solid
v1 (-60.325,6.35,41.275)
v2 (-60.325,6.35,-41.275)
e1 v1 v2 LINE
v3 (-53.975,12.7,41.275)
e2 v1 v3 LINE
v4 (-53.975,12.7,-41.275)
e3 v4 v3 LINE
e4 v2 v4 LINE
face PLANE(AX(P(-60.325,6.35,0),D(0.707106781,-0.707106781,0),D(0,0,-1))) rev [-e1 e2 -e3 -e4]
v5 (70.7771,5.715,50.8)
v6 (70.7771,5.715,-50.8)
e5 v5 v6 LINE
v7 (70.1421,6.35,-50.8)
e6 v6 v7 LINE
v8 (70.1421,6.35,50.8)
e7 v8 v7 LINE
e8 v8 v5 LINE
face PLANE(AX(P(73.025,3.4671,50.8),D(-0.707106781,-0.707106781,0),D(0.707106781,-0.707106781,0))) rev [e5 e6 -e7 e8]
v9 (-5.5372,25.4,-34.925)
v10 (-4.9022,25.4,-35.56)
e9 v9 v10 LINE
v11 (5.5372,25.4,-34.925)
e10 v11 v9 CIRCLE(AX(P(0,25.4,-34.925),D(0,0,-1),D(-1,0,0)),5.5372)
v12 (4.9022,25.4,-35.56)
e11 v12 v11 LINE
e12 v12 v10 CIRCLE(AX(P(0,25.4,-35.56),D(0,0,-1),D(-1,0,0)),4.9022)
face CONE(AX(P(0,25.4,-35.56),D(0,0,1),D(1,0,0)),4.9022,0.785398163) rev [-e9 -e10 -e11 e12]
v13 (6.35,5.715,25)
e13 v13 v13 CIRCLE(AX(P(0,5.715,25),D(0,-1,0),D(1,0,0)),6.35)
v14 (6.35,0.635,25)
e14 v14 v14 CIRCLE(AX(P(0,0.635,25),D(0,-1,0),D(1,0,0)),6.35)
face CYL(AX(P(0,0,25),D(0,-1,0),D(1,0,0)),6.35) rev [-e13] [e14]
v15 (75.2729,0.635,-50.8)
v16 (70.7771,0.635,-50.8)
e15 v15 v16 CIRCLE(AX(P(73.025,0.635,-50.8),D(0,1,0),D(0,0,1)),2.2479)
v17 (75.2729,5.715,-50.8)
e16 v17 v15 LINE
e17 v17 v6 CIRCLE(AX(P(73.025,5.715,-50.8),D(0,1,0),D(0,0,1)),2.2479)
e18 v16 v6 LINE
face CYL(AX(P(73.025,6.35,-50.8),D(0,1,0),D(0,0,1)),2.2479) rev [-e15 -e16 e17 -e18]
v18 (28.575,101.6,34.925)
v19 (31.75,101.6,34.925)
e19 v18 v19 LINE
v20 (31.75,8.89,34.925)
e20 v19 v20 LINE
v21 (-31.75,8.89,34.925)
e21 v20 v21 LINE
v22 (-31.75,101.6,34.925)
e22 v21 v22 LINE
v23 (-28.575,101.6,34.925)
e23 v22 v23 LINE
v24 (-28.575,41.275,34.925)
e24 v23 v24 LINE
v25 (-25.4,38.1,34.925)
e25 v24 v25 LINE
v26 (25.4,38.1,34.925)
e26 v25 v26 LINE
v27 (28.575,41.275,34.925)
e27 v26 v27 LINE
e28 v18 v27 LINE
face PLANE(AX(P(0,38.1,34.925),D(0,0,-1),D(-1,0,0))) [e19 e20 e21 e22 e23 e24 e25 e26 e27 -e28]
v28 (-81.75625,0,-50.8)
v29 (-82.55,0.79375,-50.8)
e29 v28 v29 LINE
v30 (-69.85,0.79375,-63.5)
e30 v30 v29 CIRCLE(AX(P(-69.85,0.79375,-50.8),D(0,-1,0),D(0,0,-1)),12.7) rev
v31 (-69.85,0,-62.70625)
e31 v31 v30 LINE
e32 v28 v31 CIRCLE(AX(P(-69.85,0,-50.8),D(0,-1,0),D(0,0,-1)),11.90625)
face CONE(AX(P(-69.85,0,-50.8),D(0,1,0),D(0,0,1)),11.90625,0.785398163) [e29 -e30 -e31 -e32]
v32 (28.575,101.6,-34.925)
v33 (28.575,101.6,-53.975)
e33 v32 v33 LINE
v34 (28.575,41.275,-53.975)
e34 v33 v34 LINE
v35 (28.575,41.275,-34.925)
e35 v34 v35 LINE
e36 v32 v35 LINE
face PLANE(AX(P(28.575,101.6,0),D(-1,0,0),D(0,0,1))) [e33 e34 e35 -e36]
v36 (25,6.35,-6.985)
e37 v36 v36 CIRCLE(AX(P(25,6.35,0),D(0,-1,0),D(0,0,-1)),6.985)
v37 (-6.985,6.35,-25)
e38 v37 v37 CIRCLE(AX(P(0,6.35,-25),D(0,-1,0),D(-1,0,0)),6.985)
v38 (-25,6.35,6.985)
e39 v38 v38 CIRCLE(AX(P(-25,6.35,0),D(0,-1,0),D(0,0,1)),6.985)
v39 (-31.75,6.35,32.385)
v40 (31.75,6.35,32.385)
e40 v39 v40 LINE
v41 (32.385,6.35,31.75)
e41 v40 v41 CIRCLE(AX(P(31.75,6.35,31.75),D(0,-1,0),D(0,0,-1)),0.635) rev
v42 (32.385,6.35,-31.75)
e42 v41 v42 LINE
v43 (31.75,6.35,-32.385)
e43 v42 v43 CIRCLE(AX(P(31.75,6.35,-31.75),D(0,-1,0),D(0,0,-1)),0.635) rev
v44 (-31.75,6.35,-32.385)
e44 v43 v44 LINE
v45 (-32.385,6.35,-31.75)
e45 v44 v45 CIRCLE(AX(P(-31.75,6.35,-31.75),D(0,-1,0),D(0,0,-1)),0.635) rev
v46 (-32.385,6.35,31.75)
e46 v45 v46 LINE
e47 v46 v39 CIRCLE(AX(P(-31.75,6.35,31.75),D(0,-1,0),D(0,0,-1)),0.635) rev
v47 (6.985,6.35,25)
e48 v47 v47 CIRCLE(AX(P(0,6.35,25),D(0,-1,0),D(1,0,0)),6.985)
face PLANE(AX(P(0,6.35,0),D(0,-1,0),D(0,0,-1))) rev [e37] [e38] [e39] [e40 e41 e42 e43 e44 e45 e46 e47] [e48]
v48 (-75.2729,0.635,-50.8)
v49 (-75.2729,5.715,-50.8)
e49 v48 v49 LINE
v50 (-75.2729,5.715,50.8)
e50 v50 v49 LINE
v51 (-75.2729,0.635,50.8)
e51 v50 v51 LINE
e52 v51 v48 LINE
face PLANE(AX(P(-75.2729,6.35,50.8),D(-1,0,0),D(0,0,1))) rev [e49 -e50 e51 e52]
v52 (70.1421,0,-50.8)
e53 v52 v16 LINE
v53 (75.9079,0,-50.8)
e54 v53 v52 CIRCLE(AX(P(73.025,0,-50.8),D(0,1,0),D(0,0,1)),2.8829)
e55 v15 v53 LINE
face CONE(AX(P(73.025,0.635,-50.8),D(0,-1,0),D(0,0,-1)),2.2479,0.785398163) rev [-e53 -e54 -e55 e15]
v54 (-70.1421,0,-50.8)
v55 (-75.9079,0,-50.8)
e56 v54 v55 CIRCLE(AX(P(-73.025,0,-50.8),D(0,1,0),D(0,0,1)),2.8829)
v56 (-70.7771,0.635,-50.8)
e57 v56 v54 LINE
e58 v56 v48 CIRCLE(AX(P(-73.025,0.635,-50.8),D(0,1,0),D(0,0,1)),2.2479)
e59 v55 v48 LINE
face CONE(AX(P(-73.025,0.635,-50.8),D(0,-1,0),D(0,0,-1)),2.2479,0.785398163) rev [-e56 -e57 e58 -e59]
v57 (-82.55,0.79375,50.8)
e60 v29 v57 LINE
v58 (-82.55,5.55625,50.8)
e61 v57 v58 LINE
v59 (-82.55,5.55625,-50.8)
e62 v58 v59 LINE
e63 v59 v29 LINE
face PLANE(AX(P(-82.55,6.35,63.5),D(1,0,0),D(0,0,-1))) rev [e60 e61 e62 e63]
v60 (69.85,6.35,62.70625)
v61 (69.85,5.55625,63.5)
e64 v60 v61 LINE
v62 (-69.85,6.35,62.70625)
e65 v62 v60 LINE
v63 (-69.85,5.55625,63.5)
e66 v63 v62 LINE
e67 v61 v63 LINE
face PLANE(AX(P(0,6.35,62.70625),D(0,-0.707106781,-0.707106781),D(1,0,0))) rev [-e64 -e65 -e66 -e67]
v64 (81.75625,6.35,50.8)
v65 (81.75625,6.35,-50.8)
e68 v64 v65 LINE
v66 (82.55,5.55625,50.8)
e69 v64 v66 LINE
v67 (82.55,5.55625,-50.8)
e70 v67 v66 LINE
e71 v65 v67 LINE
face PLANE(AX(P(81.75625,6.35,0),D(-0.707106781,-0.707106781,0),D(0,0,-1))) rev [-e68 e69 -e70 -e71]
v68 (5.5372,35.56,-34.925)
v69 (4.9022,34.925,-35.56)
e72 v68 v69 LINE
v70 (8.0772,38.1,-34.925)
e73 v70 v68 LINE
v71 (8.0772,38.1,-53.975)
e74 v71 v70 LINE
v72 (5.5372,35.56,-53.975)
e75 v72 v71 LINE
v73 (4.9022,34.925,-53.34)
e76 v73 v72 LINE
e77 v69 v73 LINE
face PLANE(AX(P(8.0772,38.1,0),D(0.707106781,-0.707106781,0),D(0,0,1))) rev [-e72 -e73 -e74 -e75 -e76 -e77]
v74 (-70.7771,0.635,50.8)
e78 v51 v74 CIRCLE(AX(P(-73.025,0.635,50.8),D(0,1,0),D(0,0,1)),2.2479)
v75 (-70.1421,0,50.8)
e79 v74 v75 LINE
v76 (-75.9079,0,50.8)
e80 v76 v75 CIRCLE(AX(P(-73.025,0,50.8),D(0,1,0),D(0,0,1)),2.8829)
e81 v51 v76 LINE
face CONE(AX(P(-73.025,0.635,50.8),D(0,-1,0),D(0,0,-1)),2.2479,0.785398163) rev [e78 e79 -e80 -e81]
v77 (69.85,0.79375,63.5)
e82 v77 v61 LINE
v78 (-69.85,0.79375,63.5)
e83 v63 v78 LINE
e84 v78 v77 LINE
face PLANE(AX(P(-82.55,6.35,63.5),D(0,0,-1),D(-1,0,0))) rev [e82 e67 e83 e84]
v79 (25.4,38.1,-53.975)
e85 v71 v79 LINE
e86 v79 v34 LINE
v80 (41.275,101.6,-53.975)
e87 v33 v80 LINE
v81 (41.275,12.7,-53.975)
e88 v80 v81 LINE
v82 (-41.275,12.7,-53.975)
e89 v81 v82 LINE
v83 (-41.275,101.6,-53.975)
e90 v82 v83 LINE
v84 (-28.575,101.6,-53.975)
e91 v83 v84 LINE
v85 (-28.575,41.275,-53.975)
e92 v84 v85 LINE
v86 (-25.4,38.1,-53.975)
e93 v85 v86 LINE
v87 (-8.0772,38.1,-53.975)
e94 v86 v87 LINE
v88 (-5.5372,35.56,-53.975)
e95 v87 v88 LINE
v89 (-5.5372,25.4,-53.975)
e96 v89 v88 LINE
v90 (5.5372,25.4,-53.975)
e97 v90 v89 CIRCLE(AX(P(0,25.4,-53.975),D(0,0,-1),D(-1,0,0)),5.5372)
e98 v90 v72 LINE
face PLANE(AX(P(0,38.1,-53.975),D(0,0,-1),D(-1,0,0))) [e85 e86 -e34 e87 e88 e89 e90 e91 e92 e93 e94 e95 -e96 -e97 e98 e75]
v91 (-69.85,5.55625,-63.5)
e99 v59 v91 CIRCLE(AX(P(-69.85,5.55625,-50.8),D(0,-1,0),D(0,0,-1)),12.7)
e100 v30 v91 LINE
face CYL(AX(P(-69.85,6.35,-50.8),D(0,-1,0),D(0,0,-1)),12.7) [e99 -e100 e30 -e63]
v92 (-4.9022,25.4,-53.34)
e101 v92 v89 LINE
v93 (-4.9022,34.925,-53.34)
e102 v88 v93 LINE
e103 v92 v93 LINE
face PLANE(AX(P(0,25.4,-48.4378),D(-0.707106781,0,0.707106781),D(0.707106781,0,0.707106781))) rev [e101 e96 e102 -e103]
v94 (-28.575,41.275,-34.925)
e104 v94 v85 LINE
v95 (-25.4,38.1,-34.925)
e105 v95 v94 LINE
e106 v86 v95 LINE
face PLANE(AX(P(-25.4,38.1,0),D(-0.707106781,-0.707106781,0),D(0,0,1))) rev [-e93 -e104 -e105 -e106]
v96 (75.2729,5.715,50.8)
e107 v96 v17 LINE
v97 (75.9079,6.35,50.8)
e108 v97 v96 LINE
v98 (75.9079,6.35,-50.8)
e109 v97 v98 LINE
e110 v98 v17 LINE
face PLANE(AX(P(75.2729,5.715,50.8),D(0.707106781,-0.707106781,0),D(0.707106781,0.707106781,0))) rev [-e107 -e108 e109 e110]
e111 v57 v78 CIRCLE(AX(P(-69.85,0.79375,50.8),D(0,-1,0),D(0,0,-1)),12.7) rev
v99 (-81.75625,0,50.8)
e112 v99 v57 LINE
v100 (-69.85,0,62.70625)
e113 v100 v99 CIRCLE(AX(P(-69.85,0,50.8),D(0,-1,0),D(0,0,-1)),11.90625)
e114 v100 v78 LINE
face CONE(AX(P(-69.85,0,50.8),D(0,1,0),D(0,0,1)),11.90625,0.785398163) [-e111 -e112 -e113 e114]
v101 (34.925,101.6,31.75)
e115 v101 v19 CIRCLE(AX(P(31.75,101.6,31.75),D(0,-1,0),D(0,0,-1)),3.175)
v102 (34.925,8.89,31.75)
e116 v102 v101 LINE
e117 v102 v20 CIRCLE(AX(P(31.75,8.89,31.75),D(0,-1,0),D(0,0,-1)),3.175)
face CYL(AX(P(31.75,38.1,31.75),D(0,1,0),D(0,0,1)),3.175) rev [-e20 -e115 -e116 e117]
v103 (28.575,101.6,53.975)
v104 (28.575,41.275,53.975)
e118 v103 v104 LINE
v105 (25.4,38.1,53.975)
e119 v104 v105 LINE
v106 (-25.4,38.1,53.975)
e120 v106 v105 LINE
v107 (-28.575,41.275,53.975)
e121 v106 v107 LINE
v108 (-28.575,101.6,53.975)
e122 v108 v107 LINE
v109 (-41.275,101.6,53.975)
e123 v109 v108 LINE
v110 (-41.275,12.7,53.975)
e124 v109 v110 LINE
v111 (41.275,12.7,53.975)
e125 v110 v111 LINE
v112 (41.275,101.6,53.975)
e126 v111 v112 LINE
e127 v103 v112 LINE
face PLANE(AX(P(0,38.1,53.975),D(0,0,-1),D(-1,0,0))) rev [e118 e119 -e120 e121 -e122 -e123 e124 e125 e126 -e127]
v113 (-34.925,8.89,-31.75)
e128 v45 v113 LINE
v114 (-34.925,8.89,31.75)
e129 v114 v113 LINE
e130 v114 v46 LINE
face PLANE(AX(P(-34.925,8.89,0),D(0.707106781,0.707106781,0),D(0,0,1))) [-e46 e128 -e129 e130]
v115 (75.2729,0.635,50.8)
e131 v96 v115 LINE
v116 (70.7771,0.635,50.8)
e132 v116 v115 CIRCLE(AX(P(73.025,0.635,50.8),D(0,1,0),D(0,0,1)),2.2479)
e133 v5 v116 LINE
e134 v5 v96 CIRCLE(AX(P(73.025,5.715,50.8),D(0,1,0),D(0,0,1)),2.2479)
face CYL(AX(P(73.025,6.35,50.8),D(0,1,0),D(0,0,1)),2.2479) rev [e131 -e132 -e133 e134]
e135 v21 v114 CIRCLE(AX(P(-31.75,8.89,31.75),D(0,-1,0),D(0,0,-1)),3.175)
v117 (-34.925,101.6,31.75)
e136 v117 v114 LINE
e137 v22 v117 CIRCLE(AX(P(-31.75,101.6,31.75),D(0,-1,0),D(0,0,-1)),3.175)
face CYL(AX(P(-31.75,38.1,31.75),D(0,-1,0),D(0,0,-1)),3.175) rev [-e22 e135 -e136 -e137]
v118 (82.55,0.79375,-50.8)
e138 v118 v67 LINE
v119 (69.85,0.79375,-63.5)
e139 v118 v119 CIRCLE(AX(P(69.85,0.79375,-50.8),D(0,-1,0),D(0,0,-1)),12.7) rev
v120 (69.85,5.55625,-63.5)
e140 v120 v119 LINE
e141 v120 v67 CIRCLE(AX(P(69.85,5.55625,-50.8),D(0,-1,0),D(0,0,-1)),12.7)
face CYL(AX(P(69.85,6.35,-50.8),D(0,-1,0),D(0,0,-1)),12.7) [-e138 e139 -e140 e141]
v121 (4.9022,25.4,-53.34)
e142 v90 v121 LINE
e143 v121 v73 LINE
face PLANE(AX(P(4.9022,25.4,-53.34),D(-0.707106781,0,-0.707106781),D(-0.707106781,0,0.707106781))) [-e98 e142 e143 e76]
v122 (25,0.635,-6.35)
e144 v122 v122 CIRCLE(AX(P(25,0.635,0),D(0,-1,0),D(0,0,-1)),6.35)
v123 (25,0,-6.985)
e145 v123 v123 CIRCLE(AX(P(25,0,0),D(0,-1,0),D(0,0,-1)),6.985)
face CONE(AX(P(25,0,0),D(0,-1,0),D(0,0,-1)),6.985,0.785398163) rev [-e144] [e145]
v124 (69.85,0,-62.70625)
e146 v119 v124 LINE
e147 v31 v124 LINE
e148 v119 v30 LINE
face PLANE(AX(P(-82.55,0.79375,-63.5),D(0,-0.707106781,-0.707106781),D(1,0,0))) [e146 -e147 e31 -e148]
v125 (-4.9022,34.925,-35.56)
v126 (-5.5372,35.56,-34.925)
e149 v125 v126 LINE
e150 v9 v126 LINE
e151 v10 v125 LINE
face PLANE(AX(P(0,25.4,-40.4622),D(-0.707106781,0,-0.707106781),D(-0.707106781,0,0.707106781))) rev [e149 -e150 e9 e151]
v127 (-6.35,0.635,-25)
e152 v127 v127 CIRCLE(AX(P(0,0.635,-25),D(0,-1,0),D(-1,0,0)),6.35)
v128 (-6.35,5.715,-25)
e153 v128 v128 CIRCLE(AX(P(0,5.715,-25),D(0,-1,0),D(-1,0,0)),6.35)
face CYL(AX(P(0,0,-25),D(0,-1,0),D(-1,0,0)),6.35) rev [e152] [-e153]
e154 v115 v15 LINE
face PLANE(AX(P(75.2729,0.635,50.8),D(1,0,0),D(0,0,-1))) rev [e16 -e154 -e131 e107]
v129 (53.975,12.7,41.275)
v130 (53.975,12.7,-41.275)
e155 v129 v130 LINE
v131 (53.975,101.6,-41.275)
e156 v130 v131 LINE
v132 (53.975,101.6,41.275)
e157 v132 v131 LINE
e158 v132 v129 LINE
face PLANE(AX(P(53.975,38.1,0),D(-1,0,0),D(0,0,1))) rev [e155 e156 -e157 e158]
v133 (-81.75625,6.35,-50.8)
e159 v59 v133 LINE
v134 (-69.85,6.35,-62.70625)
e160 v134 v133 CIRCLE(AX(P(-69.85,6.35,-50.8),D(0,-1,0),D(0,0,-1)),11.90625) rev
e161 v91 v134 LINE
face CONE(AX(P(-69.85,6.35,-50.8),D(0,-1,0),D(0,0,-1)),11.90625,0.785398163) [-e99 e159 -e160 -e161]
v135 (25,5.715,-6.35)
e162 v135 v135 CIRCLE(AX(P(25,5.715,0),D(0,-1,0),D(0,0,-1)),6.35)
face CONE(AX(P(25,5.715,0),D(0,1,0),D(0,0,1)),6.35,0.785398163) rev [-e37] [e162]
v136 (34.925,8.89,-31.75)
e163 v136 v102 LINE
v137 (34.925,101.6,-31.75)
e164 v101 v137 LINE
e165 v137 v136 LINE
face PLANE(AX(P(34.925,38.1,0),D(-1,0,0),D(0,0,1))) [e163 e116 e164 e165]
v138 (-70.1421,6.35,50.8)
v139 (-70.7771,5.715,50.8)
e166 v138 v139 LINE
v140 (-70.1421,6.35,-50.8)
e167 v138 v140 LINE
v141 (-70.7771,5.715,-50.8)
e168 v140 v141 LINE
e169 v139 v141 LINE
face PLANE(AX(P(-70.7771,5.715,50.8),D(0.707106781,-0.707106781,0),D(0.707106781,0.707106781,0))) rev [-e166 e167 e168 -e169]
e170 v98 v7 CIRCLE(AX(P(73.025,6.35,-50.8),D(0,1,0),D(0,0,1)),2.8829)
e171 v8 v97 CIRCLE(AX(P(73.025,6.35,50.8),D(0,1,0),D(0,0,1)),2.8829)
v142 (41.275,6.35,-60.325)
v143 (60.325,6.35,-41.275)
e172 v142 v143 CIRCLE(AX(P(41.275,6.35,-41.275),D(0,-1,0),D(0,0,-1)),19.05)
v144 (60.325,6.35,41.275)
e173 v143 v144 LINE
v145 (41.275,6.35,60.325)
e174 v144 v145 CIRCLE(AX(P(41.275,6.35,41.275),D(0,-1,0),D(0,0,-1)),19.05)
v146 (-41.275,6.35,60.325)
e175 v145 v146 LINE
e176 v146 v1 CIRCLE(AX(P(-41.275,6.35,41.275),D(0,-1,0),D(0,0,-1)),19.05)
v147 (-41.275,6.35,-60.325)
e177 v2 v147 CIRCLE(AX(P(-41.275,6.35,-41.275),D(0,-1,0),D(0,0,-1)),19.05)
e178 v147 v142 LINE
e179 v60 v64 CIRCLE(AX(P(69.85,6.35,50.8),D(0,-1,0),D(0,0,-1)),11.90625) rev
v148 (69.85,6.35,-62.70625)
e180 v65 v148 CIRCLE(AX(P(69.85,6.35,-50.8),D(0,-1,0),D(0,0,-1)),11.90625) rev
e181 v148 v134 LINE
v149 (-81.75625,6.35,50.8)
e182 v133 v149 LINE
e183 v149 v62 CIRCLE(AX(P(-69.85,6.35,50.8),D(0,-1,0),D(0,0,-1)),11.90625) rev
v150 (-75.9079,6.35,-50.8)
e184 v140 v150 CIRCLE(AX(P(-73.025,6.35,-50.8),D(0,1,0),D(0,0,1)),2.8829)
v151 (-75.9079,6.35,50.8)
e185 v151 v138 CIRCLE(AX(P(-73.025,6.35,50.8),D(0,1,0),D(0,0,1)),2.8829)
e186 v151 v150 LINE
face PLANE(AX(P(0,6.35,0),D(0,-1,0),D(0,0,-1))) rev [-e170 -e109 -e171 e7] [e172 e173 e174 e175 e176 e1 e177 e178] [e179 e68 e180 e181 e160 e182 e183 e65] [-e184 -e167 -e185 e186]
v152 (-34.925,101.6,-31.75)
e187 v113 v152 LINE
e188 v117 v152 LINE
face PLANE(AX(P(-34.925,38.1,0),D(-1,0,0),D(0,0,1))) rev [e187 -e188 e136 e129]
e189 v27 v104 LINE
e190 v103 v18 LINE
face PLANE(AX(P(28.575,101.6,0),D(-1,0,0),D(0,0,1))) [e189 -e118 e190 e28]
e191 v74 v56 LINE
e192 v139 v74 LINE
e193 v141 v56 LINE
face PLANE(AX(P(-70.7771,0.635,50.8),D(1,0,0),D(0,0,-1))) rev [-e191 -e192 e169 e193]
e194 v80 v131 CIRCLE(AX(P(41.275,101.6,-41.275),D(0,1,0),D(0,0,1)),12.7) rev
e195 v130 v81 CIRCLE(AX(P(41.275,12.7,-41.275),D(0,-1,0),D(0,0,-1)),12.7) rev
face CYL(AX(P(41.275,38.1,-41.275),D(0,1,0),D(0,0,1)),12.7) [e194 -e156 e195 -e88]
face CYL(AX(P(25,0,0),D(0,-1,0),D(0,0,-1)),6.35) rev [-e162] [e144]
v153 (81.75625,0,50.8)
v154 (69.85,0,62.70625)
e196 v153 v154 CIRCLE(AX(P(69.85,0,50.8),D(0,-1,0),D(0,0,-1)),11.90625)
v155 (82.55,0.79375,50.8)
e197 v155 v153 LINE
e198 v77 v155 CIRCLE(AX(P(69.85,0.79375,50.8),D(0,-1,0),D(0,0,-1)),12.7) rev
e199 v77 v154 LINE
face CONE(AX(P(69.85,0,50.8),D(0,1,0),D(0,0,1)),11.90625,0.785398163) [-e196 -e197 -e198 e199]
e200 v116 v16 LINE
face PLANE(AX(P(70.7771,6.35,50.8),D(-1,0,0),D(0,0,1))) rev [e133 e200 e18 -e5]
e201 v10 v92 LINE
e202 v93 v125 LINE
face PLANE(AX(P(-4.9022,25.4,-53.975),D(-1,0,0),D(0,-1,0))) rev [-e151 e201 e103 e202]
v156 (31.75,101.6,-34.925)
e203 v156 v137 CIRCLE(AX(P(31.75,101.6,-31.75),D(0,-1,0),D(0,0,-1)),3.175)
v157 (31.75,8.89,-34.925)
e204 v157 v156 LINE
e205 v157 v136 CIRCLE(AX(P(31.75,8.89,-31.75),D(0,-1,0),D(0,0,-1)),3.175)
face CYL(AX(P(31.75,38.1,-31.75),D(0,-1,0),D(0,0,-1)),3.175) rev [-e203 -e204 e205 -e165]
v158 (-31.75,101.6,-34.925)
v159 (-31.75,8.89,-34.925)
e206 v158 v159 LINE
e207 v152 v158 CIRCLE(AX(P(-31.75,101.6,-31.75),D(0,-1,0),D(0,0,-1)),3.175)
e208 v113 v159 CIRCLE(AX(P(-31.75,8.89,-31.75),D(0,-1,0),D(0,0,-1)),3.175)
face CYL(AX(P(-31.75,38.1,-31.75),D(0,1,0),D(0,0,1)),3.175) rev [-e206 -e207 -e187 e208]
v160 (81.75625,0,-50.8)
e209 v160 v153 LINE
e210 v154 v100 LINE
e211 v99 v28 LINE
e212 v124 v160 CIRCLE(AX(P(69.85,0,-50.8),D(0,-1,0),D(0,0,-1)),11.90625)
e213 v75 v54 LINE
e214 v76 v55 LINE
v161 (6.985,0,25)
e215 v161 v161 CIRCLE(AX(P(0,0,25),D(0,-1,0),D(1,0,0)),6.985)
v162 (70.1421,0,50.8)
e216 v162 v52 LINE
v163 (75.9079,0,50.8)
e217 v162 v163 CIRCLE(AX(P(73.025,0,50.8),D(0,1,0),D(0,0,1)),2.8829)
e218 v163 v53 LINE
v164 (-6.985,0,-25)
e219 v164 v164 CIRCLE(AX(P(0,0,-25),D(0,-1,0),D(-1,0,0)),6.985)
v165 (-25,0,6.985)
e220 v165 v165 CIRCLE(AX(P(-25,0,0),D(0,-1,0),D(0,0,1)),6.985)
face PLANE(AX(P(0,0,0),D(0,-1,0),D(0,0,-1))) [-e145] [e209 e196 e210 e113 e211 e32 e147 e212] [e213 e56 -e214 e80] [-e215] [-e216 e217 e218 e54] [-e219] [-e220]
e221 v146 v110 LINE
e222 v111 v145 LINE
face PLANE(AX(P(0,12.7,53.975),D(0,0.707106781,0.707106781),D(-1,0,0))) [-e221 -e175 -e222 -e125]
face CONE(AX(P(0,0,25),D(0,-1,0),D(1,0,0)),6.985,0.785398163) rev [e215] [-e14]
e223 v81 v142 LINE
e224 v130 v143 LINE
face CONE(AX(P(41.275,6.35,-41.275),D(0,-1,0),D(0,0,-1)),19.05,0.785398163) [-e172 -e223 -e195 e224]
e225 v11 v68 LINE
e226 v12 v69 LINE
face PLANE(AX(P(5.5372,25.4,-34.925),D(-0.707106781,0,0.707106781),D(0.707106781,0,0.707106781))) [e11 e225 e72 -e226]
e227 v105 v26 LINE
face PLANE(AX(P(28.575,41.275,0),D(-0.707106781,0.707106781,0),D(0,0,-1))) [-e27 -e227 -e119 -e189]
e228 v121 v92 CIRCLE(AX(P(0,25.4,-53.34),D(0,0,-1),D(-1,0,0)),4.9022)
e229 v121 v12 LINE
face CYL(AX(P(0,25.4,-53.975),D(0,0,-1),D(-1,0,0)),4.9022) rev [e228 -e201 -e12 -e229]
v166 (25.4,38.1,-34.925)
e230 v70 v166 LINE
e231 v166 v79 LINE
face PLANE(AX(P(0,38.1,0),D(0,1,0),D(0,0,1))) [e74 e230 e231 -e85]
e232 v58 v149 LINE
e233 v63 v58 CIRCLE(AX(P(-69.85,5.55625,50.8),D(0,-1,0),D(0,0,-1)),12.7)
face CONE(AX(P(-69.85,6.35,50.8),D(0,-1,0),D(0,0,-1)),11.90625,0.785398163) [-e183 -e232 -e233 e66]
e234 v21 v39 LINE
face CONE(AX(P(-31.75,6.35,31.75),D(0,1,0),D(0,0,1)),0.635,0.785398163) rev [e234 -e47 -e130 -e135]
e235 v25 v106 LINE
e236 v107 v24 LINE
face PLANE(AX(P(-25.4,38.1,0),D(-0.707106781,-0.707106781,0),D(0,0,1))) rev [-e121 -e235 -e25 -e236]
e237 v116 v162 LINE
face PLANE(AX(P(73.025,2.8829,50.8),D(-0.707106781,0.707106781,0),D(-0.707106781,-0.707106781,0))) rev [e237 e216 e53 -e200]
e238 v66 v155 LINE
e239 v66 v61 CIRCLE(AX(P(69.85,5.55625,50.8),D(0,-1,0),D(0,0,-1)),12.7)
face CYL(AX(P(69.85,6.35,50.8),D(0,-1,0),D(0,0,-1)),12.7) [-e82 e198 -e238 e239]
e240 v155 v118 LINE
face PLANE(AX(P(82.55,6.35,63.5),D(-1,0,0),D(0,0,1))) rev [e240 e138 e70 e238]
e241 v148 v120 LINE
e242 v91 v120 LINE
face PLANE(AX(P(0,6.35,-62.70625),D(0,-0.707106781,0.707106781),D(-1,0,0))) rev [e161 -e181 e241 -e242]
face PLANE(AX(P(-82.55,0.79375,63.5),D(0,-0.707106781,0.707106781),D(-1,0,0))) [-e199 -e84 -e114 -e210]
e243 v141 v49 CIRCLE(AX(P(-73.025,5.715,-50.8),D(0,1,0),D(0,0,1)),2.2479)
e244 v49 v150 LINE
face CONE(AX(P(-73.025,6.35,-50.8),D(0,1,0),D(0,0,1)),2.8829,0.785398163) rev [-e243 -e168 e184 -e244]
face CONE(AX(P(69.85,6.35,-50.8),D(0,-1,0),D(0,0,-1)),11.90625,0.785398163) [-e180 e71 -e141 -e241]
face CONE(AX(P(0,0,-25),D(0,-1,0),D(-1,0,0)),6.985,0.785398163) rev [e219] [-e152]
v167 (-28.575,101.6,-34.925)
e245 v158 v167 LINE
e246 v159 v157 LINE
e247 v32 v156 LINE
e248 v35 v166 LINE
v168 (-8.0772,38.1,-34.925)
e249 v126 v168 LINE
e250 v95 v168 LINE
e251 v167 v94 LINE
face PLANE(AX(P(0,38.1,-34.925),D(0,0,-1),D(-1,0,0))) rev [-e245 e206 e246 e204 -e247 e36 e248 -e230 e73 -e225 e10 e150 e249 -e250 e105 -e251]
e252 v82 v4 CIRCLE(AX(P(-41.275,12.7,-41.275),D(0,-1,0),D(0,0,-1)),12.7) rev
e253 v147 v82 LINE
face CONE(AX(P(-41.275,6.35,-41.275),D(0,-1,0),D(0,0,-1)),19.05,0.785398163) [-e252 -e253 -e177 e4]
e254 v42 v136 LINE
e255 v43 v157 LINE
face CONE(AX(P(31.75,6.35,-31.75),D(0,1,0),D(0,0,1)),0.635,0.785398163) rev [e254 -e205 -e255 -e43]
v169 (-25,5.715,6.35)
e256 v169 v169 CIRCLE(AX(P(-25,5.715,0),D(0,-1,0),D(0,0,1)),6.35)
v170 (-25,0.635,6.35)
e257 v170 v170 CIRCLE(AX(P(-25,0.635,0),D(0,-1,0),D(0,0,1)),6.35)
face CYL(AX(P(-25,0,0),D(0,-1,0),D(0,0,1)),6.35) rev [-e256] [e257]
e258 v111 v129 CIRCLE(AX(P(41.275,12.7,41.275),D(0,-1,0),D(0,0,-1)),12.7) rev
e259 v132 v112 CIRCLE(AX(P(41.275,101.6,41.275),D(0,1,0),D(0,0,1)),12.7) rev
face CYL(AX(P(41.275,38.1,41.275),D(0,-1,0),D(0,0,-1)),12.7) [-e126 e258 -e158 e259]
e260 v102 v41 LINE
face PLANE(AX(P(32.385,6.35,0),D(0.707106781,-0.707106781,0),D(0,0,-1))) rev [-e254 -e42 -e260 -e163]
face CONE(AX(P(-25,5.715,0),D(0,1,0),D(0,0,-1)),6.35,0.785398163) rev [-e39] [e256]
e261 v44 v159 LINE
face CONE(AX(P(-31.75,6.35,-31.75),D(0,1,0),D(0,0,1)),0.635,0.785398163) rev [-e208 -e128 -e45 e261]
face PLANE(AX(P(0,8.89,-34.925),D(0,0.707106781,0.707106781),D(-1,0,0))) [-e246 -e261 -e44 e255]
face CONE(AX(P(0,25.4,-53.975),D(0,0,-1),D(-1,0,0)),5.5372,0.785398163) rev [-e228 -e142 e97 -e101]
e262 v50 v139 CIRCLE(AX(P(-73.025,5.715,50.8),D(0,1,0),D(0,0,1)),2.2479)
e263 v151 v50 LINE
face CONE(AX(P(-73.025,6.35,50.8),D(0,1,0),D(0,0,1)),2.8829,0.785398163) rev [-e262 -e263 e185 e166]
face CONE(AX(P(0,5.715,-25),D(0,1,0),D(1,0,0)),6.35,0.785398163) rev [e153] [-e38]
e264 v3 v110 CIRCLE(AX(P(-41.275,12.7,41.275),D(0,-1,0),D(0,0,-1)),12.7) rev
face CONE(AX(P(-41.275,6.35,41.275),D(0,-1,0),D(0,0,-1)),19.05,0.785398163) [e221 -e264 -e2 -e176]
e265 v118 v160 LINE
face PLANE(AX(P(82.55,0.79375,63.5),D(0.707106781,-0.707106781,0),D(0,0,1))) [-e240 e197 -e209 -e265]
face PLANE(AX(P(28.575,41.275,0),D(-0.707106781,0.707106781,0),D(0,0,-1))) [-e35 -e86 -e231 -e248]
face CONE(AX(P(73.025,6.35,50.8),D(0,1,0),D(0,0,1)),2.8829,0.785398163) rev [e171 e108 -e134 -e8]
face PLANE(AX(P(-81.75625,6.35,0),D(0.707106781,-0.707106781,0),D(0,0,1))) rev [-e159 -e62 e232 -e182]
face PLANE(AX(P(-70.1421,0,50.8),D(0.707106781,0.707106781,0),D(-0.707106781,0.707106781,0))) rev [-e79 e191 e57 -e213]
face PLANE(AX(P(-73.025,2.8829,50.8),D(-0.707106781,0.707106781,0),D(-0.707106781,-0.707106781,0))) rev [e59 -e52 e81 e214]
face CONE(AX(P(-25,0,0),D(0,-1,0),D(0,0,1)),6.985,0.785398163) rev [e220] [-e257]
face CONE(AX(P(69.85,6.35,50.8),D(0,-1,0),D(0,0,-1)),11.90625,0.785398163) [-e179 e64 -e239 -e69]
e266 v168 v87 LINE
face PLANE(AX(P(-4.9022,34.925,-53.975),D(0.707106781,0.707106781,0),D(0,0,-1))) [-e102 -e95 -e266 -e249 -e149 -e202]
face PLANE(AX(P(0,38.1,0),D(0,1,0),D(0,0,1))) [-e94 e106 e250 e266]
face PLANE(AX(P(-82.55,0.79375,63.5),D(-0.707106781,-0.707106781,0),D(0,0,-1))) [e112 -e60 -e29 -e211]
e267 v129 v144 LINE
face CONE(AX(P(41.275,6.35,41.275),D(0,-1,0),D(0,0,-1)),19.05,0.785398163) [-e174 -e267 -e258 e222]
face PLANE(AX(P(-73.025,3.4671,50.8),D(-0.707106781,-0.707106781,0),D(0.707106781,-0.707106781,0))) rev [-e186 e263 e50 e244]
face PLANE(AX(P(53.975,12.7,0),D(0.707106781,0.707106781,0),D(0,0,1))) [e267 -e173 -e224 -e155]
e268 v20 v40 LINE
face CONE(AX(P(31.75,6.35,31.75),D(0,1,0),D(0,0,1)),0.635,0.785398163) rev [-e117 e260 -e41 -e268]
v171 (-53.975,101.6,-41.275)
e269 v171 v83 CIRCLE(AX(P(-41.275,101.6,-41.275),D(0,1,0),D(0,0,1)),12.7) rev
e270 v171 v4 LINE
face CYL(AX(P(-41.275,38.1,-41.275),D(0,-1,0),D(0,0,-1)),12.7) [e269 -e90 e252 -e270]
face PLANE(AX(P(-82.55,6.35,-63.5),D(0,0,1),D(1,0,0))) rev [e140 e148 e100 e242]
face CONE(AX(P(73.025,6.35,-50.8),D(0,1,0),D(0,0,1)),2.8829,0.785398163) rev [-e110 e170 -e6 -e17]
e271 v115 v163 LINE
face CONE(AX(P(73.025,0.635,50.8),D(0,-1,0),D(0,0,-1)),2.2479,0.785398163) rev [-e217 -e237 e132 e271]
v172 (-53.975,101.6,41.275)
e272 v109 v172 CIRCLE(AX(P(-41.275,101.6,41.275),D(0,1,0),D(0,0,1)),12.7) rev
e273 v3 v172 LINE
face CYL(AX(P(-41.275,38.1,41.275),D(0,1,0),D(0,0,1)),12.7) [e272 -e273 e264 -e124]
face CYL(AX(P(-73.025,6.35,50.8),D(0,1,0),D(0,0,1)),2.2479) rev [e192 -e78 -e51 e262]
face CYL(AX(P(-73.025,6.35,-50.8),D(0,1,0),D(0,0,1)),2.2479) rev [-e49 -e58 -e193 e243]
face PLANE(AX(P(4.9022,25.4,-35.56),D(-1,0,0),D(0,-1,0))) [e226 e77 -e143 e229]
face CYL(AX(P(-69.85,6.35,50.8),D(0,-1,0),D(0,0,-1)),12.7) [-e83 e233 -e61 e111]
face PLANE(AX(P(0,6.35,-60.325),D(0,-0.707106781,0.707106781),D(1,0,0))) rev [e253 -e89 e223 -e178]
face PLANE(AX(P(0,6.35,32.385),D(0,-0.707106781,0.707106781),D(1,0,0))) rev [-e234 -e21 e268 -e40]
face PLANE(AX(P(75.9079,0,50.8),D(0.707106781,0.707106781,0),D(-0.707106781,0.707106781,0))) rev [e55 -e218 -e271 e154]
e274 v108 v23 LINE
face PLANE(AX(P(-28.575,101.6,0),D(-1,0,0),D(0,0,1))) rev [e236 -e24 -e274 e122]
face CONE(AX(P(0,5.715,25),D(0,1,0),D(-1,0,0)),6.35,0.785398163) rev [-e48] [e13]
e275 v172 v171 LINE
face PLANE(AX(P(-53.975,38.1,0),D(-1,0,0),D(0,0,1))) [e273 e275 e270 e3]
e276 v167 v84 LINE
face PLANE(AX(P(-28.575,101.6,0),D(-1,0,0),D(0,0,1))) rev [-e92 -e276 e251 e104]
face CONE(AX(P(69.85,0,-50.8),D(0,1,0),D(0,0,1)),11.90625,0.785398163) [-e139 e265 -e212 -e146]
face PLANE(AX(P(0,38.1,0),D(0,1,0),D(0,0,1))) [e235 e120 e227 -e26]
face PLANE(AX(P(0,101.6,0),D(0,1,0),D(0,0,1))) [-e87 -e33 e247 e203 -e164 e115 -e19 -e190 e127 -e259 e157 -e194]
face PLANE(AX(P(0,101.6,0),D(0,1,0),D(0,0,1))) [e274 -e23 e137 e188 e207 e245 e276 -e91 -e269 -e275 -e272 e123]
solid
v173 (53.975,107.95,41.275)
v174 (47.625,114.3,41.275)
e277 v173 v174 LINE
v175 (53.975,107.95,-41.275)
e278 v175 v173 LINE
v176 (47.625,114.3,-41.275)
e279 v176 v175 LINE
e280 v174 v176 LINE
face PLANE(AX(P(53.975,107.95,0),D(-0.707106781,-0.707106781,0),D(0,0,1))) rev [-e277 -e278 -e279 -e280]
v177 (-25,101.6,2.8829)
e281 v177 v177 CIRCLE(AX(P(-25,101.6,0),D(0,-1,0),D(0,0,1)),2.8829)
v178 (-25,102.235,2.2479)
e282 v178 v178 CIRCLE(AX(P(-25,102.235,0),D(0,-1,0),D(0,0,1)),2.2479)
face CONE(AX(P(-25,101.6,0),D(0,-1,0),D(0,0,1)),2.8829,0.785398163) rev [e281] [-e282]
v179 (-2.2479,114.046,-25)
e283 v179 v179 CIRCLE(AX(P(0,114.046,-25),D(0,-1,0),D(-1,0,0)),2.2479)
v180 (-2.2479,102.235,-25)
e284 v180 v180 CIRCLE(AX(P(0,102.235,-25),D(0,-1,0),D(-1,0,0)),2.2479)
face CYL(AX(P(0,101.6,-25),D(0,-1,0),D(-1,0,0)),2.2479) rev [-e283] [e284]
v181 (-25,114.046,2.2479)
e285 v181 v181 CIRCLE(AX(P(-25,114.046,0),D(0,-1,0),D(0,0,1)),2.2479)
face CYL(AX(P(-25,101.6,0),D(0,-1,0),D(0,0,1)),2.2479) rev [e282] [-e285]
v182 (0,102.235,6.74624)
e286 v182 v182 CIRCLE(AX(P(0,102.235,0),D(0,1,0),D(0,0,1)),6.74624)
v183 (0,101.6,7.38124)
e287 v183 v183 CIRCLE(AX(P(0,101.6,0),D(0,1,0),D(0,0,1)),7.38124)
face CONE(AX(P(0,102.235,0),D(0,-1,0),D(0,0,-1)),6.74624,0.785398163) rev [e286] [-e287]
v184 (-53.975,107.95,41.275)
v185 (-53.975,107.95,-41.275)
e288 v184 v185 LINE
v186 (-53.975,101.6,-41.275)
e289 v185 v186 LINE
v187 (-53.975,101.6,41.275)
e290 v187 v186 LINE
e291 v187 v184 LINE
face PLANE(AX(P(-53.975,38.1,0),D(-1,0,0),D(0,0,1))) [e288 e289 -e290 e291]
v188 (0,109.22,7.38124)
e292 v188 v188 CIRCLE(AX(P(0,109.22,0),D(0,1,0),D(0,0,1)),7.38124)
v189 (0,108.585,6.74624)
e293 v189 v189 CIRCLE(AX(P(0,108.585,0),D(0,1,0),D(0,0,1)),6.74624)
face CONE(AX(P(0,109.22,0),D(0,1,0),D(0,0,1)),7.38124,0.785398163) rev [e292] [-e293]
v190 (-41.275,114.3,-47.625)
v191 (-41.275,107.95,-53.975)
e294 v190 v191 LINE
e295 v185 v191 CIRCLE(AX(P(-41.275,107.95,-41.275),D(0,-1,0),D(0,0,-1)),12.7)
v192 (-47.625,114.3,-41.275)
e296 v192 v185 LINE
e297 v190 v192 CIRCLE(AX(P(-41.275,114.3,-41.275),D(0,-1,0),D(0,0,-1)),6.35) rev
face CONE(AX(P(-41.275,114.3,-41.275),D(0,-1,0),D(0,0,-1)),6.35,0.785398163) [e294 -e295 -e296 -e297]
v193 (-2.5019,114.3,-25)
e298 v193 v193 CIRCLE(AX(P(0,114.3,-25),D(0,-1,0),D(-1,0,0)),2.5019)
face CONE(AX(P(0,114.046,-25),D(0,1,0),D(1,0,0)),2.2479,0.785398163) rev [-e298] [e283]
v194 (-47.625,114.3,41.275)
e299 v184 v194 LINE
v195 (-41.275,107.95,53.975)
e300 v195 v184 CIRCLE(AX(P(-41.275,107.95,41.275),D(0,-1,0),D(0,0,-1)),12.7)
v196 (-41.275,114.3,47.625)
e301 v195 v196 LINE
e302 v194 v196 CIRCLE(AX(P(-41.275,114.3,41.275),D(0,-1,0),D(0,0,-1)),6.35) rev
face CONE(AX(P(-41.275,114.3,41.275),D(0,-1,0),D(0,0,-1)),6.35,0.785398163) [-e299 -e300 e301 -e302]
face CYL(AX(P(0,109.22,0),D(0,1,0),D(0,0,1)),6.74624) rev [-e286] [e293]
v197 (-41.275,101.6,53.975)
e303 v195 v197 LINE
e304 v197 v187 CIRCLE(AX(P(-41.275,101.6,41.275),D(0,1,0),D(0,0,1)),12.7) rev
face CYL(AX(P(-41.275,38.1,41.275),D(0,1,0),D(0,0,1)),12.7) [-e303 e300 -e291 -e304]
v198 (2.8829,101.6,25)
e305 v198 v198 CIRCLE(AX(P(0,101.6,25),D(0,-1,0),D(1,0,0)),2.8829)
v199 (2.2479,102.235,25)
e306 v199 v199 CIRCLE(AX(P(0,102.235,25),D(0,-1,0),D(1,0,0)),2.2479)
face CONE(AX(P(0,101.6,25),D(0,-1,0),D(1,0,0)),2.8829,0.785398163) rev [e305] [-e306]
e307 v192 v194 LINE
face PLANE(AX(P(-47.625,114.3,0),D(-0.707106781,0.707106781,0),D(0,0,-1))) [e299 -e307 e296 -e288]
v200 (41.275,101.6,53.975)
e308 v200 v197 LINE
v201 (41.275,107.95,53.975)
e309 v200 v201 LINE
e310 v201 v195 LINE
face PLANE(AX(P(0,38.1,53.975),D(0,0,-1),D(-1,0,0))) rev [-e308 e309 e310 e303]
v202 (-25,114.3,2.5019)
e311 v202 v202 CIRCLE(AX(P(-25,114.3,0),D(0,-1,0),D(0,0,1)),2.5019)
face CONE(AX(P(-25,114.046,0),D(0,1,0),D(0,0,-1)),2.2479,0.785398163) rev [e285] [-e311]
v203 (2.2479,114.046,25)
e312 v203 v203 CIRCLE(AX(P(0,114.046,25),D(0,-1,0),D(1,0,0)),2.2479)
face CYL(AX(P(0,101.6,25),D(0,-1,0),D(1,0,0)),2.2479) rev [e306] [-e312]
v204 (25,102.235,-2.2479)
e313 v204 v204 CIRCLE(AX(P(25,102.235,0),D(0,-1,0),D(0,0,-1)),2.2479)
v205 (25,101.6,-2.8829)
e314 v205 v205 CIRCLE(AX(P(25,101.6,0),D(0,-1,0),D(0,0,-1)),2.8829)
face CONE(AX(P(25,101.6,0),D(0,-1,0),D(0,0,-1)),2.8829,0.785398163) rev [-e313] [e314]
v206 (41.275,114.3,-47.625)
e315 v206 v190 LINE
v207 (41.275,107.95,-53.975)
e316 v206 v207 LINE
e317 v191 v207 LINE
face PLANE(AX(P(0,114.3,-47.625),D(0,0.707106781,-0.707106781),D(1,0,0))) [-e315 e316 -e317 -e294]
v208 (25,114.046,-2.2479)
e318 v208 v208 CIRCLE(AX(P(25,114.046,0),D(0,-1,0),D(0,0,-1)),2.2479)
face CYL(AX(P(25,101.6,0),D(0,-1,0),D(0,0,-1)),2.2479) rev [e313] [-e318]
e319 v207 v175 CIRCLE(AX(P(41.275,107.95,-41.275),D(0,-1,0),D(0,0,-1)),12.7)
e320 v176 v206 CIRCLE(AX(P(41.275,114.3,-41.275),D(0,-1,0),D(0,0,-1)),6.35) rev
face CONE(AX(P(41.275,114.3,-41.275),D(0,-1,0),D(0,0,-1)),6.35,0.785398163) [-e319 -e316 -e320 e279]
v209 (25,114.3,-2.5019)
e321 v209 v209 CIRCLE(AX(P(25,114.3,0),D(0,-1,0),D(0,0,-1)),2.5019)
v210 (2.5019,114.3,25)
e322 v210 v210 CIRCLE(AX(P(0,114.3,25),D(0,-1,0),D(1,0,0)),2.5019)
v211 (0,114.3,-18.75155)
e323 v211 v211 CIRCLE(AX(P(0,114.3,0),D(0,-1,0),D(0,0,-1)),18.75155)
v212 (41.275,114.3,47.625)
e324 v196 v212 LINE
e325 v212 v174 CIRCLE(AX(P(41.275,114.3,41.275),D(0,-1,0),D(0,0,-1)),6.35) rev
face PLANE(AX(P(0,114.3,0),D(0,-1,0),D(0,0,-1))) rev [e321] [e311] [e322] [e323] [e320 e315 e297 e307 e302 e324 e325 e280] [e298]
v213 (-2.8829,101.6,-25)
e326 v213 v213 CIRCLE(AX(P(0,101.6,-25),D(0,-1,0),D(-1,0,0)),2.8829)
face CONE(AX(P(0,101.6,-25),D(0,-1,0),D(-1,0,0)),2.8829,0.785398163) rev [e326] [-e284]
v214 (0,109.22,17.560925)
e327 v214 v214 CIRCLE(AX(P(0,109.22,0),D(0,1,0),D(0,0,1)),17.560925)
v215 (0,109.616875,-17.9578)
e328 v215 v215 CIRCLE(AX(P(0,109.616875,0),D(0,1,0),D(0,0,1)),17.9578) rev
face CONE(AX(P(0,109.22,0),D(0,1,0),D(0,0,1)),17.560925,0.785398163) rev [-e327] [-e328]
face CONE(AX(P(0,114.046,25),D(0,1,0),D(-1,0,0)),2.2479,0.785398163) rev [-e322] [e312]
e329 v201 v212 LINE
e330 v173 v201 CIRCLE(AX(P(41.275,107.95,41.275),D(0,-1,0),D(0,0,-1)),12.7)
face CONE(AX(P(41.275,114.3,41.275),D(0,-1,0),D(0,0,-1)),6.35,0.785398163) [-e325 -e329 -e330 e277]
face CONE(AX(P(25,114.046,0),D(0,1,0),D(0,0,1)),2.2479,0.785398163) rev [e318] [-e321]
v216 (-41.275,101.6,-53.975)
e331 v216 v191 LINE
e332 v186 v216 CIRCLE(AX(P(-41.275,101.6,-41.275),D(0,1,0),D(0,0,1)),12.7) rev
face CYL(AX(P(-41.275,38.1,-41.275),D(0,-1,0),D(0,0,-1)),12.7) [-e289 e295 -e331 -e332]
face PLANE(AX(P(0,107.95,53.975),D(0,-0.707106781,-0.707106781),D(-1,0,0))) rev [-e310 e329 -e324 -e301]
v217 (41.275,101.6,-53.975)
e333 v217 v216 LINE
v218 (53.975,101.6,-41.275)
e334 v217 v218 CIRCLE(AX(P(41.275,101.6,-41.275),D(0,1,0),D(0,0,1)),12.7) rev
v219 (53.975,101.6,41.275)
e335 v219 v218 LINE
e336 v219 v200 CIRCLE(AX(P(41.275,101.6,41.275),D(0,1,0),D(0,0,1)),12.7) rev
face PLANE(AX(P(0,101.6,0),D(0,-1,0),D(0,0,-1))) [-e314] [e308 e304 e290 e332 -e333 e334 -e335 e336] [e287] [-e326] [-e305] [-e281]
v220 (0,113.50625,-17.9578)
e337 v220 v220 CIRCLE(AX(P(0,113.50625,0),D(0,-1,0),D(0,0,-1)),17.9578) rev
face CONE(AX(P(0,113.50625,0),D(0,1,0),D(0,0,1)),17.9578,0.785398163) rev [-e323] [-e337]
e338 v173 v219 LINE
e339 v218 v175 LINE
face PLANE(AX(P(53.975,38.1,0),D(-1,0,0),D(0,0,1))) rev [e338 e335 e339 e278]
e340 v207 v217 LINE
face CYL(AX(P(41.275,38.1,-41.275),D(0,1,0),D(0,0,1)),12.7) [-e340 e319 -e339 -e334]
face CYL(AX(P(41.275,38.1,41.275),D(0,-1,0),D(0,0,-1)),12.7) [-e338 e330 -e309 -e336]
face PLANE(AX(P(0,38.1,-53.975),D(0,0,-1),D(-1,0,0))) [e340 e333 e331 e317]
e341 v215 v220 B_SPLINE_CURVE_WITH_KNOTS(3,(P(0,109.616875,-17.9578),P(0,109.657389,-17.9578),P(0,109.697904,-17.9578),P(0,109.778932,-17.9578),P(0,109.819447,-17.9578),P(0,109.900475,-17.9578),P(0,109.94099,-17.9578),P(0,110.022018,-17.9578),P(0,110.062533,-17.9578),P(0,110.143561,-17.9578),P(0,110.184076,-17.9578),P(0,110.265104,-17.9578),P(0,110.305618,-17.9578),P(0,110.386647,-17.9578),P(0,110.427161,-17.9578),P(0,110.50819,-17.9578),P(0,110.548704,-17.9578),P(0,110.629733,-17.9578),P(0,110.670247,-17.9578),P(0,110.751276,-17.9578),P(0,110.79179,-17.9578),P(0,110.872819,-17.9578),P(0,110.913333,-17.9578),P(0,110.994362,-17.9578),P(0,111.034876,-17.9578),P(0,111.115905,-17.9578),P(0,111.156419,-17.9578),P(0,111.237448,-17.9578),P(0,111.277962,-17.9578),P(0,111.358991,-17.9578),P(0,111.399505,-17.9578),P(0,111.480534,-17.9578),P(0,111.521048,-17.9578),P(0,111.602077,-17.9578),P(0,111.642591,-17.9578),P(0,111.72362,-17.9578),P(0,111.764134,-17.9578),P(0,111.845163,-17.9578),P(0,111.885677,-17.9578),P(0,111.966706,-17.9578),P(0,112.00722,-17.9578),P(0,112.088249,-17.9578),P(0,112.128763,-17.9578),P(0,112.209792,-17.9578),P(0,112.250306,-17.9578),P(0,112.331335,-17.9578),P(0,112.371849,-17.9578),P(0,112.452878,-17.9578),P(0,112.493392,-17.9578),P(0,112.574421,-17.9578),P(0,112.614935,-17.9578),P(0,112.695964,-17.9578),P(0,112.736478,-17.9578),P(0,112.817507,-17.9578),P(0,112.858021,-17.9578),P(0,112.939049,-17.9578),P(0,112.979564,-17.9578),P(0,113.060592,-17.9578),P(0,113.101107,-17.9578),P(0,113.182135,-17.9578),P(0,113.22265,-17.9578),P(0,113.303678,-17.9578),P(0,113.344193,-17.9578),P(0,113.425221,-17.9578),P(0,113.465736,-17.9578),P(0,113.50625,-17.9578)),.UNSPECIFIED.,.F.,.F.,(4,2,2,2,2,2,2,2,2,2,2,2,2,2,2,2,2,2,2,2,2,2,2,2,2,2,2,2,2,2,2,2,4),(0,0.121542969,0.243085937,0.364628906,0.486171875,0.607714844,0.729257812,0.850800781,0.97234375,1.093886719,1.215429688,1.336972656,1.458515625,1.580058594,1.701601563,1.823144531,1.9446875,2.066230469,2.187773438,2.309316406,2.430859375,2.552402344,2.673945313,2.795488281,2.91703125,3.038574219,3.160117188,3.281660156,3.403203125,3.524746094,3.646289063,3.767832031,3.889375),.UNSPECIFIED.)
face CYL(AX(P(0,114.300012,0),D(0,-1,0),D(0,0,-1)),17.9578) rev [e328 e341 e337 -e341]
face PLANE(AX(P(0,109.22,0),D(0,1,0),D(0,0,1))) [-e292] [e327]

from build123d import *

# Parameters (mm, degrees)
SKETCH1_W                     = 165.1
SKETCH1_H                     = 127
BOSS_EXTRUDE1_DEPTH           = 6.35
SKETCH2_W                     = 57.15
SKETCH2_H                     = 19.05
BOSS_EXTRUDE2_DEPTH           = 38.1
BOSS_EXTRUDE3_DEPTH           = 101.6
BOSS_EXTRUDE4_START           = 101.6
SKETCH2_4_W                   = 57.15
SKETCH2_4_H                   = 19.05
SKETCH2_4_W_2                 = 69.85
SKETCH2_4_H_2                 = 69.85
BOSS_EXTRUDE4_DEPTH           = 12.7
CUT_EXTRUDE1_DEPTH            = 155.632604906
CUT_EXTRUDE1_DEPTH_BACK       = 5.08
SKETCH7_R                     = 17.9578
F_8_START                     = -50.8
F_8_CLEARANCE_SLOT1_2_DEPTH   = 101.6
CIRPATTERN1_COUNT             = 4
F_3_8_START                   = 25.4
F_3_8_CLEARANCE_SLOT1_2_DEPTH = 12.7
FILLET2_R                     = 3.175
FILLET1_R                     = 12.7
CHAMFER1_SIZE                 = 2.54
CHAMFER8_SIZE                 = 6.35
CHAMFER2_SIZE                 = 6.35
CHAMFER9_SIZE                 = 3.175
CHAMFER3_SIZE                 = 0.79375
CHAMFER5_SIZE                 = 0.79375
CHAMFER6_SIZE                 = 0.396875


with BuildPart() as part:
    # Sketch1 → Boss-Extrude1 (new body)
    with BuildSketch(Plane(origin=(0, 0, 0), x_dir=(1, 0, 0), z_dir=(0, 1, 0))):
        Rectangle(SKETCH1_W, SKETCH1_H)
    extrude(amount=BOSS_EXTRUDE1_DEPTH)

    # Sketch2 → Boss-Extrude2 (add)
    with BuildSketch(Plane(origin=(0, 0, 0), x_dir=(1, 0, 0), z_dir=(0, 1, 0))):
        Polygon((-28.575, 53.975), (-53.975, 53.975), (-53.975, -53.975), (-28.575, -53.975), (-28.575, -34.925), (-34.925, -34.925), (-34.925, 34.925), (-28.575, 34.925), align=None)
        with Locations((0, 44.45)):
            Rectangle(SKETCH2_W, SKETCH2_H)
        Polygon((53.975, 53.975), (28.575, 53.975), (28.575, 34.925), (34.925, 34.925), (34.925, -34.925), (28.575, -34.925), (28.575, -53.975), (53.975, -53.975), align=None)
        with Locations((0, -44.45)):
            Rectangle(SKETCH2_W, SKETCH2_H)
    extrude(amount=BOSS_EXTRUDE2_DEPTH)

    # Sketch2<3> → Boss-Extrude3 (add)
    with BuildSketch(Plane(origin=(0, 0, 0), x_dir=(1, 0, 0), z_dir=(0, 1, 0))):
        Polygon((-28.575, 53.975), (-53.975, 53.975), (-53.975, -53.975), (-28.575, -53.975), (-28.575, -34.925), (-34.925, -34.925), (-34.925, 34.925), (-28.575, 34.925), align=None)
        Polygon((53.975, 53.975), (28.575, 53.975), (28.575, 34.925), (34.925, 34.925), (34.925, -34.925), (28.575, -34.925), (28.575, -53.975), (53.975, -53.975), align=None)
    extrude(amount=BOSS_EXTRUDE3_DEPTH)

    # Sketch2<4> → Boss-Extrude4 (add)
    with BuildSketch(Plane(origin=(0, 0, 0), x_dir=(1, 0, 0), z_dir=(0, 1, 0)).offset(BOSS_EXTRUDE4_START)):
        with Locations((0, 44.45)):
            Rectangle(SKETCH2_4_W, SKETCH2_4_H)
        Polygon((-28.575, 53.975), (-53.975, 53.975), (-53.975, -53.975), (-28.575, -53.975), (-28.575, -34.925), (-34.925, -34.925), (-34.925, 34.925), (-28.575, 34.925), align=None)
        with Locations((0, -44.45)):
            Rectangle(SKETCH2_4_W, SKETCH2_4_H)
        Polygon((53.975, 53.975), (28.575, 53.975), (28.575, 34.925), (34.925, 34.925), (34.925, -34.925), (28.575, -34.925), (28.575, -53.975), (53.975, -53.975), align=None)
        Rectangle(SKETCH2_4_W_2, SKETCH2_4_H_2)
    extrude(amount=BOSS_EXTRUDE4_DEPTH)

    # Sketch7 → Cut-Extrude1 (cut, two sides: drawn at the far end of the back side and taken through both)
    with BuildSketch(Plane(origin=(0, 114.3, 0), x_dir=(1, 0, 0), z_dir=(0, 1, 0)).offset(-CUT_EXTRUDE1_DEPTH_BACK)):
        with Locations(Location((0, 0, 0), (0, 0, 90))):
            Circle(SKETCH7_R)
    extrude(amount=CUT_EXTRUDE1_DEPTH + CUT_EXTRUDE1_DEPTH_BACK, mode=Mode.SUBTRACT)

    # Sketch19 → 1/2 Clearance Hole1 (revolve, cut)
    with BuildSketch(Plane(origin=(0, 109.22, 0), x_dir=(0, 0, 1), z_dir=(1, 0, 0))):
        Polygon((0, 0), (0, 7.62), (7.38124, 7.62), (6.74624, 6.985), (6.74624, 0.635), (7.38124, 0), align=None)
    revolve(axis=Axis((0, 115.57, 0), (0, -1, 0)), mode=Mode.SUBTRACT)

    # #8 Clearance Slot1: read off the stored shape, not the designer's step
    # #8 Clearance Slot1 outline → #8 Clearance Slot1 (revolve, cut)
    with BuildSketch(Plane(origin=(73.025, 0, -50.8), x_dir=(1, 0, 0), z_dir=(0, 0, 1))):
        Polygon((0, 0), (2.8829, 0), (2.2479, 0.635), (2.2479, 5.715), (2.8829, 6.35), (0, 6.35), align=None)
    revolve(axis=Axis((73.025, 0, -50.8), (0, 1, 0)), mode=Mode.SUBTRACT)

    # 8 Clearance Slot1 2 outline → 8 Clearance Slot1 2 (cut)
    with BuildSketch(Plane.XY.offset(F_8_START)):
        Polygon((75.9079, 6.35), (70.1421, 6.35), (70.7771, 5.715), (70.7771, 0.635), (70.1421, 0), (75.9079, 0), (75.2729, 0.635), (75.2729, 5.715), align=None)
        Polygon((-70.7771, 5.715), (-70.1421, 6.35), (-75.9079, 6.35), (-75.2729, 5.715), (-75.2729, 0.635), (-75.9079, 0), (-70.1421, 0), (-70.7771, 0.635), align=None)
    extrude(amount=F_8_CLEARANCE_SLOT1_2_DEPTH, mode=Mode.SUBTRACT)

    # 8 Clearance Slot1 3 outline → 8 Clearance Slot1 3 (revolve, cut)
    with BuildSketch(Plane(origin=(73.025, 0, 50.8), x_dir=(1, 0, 0), z_dir=(0, 0, 1))):
        Polygon((0, 0), (2.8829, 0), (2.2479, 0.635), (2.2479, 5.715), (2.8829, 6.35), (0, 6.35), align=None)
    revolve(axis=Axis((73.025, 0, 50.8), (0, 1, 0)), mode=Mode.SUBTRACT)

    # 8 Clearance Slot1 4 outline → 8 Clearance Slot1 4 (revolve, cut)
    with BuildSketch(Plane(origin=(-73.025, 0, -50.8), x_dir=(1, 0, 0), z_dir=(0, 0, 1))):
        Polygon((0, 0), (2.8829, 0), (2.2479, 0.635), (2.2479, 5.715), (2.8829, 6.35), (0, 6.35), align=None)
    revolve(axis=Axis((-73.025, 0, -50.8), (0, 1, 0)), mode=Mode.SUBTRACT)

    # 8 Clearance Slot1 5 outline → 8 Clearance Slot1 5 (revolve, cut)
    with BuildSketch(Plane(origin=(-73.025, 0, 50.8), x_dir=(1, 0, 0), z_dir=(0, 0, 1))):
        Polygon((0, 0), (2.8829, 0), (2.2479, 0.635), (2.2479, 5.715), (2.8829, 6.35), (0, 6.35), align=None)
    revolve(axis=Axis((-73.025, 0, 50.8), (0, 1, 0)), mode=Mode.SUBTRACT)

    # Sketch11 → 1/2 (0.5) Diameter Hole1 (revolve, cut)
    with BuildSketch(Plane(origin=(25, 0, 0), x_dir=(0, 0, -1), z_dir=(1, 0, 0))):
        Polygon((0, 0), (0, 6.35), (6.985, 6.35), (6.35, 5.715), (6.35, 0.635), (6.985, 0), align=None)
    f_1_2_0_5_diameter_hole1 = revolve(axis=Axis((25, -6.35, 0), (0, 1, 0)), mode=Mode.SUBTRACT)

    # Sketch13 → #8 Clearance Hole2 (revolve, cut)
    with BuildSketch(Plane(origin=(25, 101.6, 0), x_dir=(0, 0, -1), z_dir=(1, 0, 0))):
        Polygon((0, 0), (0, 12.7), (2.5019, 12.7), (2.2479, 12.446), (2.2479, 0.635), (2.8829, 0), align=None)
    f_8_clearance_hole2 = revolve(axis=Axis((25, 95.25, 0), (0, 1, 0)), mode=Mode.SUBTRACT)

    # CirPattern1: 1/2 (0.5) Diameter Hole1, #8 Clearance Hole2 ×4 about axis
    cirpattern1_axis = Axis((0, 0, 0), (0, 1, 0))
    add([f_1_2_0_5_diameter_hole1.rotate(cirpattern1_axis, i * 360 / CIRPATTERN1_COUNT) for i in range(1, CIRPATTERN1_COUNT)], mode=Mode.SUBTRACT)
    add([f_8_clearance_hole2.rotate(cirpattern1_axis, i * 360 / CIRPATTERN1_COUNT) for i in range(1, CIRPATTERN1_COUNT)], mode=Mode.SUBTRACT)

    # 3/8 Clearance Slot1: read off the stored shape, not the designer's step
    # 3/8 Clearance Slot1 outline → 3/8 Clearance Slot1 (revolve, cut)
    with BuildSketch(Plane.XZ.offset(-25.4)):
        Polygon((5.5372, -34.925), (0, -34.925), (0, -53.975), (5.5372, -53.975), (4.9022, -53.34), (4.9022, -35.56), align=None)
    revolve(axis=Axis((0, 25.4, 0), (0, 0, 1)), mode=Mode.SUBTRACT)

    # 3_8 Clearance Slot1 2 outline → 3_8 Clearance Slot1 2 (cut)
    with BuildSketch(Plane(origin=(0, 0, 0), x_dir=(1, 0, 0), z_dir=(0, 1, 0)).offset(F_3_8_START)):
        Polygon((4.9022, 53.34), (5.5372, 53.975), (-5.5372, 53.975), (-4.9022, 53.34), (-4.9022, 35.56), (-5.5372, 34.925), (5.5372, 34.925), (4.9022, 35.56), align=None)
    extrude(amount=F_3_8_CLEARANCE_SLOT1_2_DEPTH, mode=Mode.SUBTRACT)

    # Fillet2
    fillet2_edges = [part.edges().sort_by_distance(p)[0] for p in [
        (-34.925, 53.975, -34.925),
        (34.925, 53.975, -34.925),
        (34.925, 53.975, 34.925),
        (-34.925, 53.975, 34.925),
    ]]
    fillet(fillet2_edges, radius=FILLET2_R)

    # Fillet1
    fillet1_edges = [part.edges().sort_by_distance(p)[0] for p in [
        (53.975, 60.325, 53.975),
        (53.975, 60.325, -53.975),
        (-53.975, 60.325, -53.975),
        (-53.975, 60.325, 53.975),
        (82.55, 3.175, 63.5),
        (-82.55, 3.175, 63.5),
        (-82.55, 3.175, -63.5),
        (82.55, 3.175, -63.5),
    ]]
    fillet(fillet1_edges, radius=FILLET1_R)

    # Chamfer1
    chamfer1_edges = [part.edges().sort_by_distance(p)[0] for p in [
        (0, 6.35, -34.925),
        (-34.925, 6.35, 0),
        (0, 6.35, 34.925),
        (34.925, 6.35, 0),
        (33.99506403, 6.35, 33.99506403),
        (-33.99506403, 6.35, 33.99506403),
        (33.99506403, 6.35, -33.99506403),
        (-33.99506403, 6.35, -33.99506403),
    ]]
    chamfer(chamfer1_edges, length=CHAMFER1_SIZE)

    # Chamfer8
    chamfer8_edges = [part.edges().sort_by_distance(p)[0] for p in [
        (53.975, 6.35, 0),
        (0, 6.35, 53.975),
        (-53.975, 6.35, 0),
        (0, 6.35, -53.975),
        (-50.255256121, 6.35, -50.255256121),
        (50.255256121, 6.35, -50.255256121),
        (50.255256121, 6.35, 50.255256121),
        (-50.255256121, 6.35, 50.255256121),
    ]]
    chamfer(chamfer8_edges, length=CHAMFER8_SIZE)

    # Chamfer2
    chamfer2_edges = [part.edges().sort_by_distance(p)[0] for p in [
        (-53.975, 114.3, 0),
        (0, 114.3, -53.975),
        (0, 114.3, 53.975),
        (53.975, 114.3, 0),
        (-50.255256121, 114.3, 50.255256121),
        (50.255256121, 114.3, 50.255256121),
        (50.255256121, 114.3, -50.255256121),
        (-50.255256121, 114.3, -50.255256121),
    ]]
    chamfer(chamfer2_edges, length=CHAMFER2_SIZE)

    # Chamfer9
    chamfer9_edges = [part.edges().sort_by_distance(p)[0] for p in [
        (28.575, 38.1, -44.45),
        (28.575, 38.1, 44.45),
        (-4.9022, 38.1, -44.45),
        (4.9022, 38.1, -44.45),
        (-28.575, 38.1, 44.45),
        (-28.575, 38.1, -44.45),
    ]]
    chamfer(chamfer9_edges, length=CHAMFER9_SIZE)

    # Chamfer3
    chamfer3_edges = [part.edges().sort_by_distance(p)[0] for p in [
        (0, 0, -63.5),
        (0, 6.35, -63.5),
        (82.55, 0, 0),
        (0, 0, 63.5),
        (-82.55, 0, 0),
        (78.830256121, 0, 59.780256121),
        (-78.830256121, 0, 59.780256121),
        (-78.830256121, 0, -59.780256121),
        (78.830256121, 0, -59.780256121),
        (82.55, 6.35, 0),
        (-82.55, 6.35, 0),
        (0, 6.35, 63.5),
        (78.830256121, 6.35, 59.780256121),
        (-78.830256121, 6.35, 59.780256121),
        (-78.830256121, 6.35, -59.780256121),
        (78.830256121, 6.35, -59.780256121),
    ]]
    chamfer(chamfer3_edges, length=CHAMFER3_SIZE)

    # Chamfer5
    chamfer5_edges = [part.edges().sort_by_distance(p)[0] for p in [
        (0, 114.3, 17.9578),
    ]]
    chamfer(chamfer5_edges, length=CHAMFER5_SIZE)

    # Chamfer6
    chamfer6_edges = [part.edges().sort_by_distance(p)[0] for p in [
        (0, 109.22, 17.9578),
    ]]
    chamfer(chamfer6_edges, length=CHAMFER6_SIZE)


with BuildPart() as body_2:
    # Split1: the piece on the far side of the plane
    add(part.part)
    split(bisect_by=Plane.ZX.offset(101.6), keep=Keep.BOTTOM)


with BuildPart() as part_1:
    add(part.part)

    # Split1
    split(bisect_by=Plane.ZX.offset(101.6), keep=Keep.TOP)


solid = Compound([body_2.part, part_1.part])
